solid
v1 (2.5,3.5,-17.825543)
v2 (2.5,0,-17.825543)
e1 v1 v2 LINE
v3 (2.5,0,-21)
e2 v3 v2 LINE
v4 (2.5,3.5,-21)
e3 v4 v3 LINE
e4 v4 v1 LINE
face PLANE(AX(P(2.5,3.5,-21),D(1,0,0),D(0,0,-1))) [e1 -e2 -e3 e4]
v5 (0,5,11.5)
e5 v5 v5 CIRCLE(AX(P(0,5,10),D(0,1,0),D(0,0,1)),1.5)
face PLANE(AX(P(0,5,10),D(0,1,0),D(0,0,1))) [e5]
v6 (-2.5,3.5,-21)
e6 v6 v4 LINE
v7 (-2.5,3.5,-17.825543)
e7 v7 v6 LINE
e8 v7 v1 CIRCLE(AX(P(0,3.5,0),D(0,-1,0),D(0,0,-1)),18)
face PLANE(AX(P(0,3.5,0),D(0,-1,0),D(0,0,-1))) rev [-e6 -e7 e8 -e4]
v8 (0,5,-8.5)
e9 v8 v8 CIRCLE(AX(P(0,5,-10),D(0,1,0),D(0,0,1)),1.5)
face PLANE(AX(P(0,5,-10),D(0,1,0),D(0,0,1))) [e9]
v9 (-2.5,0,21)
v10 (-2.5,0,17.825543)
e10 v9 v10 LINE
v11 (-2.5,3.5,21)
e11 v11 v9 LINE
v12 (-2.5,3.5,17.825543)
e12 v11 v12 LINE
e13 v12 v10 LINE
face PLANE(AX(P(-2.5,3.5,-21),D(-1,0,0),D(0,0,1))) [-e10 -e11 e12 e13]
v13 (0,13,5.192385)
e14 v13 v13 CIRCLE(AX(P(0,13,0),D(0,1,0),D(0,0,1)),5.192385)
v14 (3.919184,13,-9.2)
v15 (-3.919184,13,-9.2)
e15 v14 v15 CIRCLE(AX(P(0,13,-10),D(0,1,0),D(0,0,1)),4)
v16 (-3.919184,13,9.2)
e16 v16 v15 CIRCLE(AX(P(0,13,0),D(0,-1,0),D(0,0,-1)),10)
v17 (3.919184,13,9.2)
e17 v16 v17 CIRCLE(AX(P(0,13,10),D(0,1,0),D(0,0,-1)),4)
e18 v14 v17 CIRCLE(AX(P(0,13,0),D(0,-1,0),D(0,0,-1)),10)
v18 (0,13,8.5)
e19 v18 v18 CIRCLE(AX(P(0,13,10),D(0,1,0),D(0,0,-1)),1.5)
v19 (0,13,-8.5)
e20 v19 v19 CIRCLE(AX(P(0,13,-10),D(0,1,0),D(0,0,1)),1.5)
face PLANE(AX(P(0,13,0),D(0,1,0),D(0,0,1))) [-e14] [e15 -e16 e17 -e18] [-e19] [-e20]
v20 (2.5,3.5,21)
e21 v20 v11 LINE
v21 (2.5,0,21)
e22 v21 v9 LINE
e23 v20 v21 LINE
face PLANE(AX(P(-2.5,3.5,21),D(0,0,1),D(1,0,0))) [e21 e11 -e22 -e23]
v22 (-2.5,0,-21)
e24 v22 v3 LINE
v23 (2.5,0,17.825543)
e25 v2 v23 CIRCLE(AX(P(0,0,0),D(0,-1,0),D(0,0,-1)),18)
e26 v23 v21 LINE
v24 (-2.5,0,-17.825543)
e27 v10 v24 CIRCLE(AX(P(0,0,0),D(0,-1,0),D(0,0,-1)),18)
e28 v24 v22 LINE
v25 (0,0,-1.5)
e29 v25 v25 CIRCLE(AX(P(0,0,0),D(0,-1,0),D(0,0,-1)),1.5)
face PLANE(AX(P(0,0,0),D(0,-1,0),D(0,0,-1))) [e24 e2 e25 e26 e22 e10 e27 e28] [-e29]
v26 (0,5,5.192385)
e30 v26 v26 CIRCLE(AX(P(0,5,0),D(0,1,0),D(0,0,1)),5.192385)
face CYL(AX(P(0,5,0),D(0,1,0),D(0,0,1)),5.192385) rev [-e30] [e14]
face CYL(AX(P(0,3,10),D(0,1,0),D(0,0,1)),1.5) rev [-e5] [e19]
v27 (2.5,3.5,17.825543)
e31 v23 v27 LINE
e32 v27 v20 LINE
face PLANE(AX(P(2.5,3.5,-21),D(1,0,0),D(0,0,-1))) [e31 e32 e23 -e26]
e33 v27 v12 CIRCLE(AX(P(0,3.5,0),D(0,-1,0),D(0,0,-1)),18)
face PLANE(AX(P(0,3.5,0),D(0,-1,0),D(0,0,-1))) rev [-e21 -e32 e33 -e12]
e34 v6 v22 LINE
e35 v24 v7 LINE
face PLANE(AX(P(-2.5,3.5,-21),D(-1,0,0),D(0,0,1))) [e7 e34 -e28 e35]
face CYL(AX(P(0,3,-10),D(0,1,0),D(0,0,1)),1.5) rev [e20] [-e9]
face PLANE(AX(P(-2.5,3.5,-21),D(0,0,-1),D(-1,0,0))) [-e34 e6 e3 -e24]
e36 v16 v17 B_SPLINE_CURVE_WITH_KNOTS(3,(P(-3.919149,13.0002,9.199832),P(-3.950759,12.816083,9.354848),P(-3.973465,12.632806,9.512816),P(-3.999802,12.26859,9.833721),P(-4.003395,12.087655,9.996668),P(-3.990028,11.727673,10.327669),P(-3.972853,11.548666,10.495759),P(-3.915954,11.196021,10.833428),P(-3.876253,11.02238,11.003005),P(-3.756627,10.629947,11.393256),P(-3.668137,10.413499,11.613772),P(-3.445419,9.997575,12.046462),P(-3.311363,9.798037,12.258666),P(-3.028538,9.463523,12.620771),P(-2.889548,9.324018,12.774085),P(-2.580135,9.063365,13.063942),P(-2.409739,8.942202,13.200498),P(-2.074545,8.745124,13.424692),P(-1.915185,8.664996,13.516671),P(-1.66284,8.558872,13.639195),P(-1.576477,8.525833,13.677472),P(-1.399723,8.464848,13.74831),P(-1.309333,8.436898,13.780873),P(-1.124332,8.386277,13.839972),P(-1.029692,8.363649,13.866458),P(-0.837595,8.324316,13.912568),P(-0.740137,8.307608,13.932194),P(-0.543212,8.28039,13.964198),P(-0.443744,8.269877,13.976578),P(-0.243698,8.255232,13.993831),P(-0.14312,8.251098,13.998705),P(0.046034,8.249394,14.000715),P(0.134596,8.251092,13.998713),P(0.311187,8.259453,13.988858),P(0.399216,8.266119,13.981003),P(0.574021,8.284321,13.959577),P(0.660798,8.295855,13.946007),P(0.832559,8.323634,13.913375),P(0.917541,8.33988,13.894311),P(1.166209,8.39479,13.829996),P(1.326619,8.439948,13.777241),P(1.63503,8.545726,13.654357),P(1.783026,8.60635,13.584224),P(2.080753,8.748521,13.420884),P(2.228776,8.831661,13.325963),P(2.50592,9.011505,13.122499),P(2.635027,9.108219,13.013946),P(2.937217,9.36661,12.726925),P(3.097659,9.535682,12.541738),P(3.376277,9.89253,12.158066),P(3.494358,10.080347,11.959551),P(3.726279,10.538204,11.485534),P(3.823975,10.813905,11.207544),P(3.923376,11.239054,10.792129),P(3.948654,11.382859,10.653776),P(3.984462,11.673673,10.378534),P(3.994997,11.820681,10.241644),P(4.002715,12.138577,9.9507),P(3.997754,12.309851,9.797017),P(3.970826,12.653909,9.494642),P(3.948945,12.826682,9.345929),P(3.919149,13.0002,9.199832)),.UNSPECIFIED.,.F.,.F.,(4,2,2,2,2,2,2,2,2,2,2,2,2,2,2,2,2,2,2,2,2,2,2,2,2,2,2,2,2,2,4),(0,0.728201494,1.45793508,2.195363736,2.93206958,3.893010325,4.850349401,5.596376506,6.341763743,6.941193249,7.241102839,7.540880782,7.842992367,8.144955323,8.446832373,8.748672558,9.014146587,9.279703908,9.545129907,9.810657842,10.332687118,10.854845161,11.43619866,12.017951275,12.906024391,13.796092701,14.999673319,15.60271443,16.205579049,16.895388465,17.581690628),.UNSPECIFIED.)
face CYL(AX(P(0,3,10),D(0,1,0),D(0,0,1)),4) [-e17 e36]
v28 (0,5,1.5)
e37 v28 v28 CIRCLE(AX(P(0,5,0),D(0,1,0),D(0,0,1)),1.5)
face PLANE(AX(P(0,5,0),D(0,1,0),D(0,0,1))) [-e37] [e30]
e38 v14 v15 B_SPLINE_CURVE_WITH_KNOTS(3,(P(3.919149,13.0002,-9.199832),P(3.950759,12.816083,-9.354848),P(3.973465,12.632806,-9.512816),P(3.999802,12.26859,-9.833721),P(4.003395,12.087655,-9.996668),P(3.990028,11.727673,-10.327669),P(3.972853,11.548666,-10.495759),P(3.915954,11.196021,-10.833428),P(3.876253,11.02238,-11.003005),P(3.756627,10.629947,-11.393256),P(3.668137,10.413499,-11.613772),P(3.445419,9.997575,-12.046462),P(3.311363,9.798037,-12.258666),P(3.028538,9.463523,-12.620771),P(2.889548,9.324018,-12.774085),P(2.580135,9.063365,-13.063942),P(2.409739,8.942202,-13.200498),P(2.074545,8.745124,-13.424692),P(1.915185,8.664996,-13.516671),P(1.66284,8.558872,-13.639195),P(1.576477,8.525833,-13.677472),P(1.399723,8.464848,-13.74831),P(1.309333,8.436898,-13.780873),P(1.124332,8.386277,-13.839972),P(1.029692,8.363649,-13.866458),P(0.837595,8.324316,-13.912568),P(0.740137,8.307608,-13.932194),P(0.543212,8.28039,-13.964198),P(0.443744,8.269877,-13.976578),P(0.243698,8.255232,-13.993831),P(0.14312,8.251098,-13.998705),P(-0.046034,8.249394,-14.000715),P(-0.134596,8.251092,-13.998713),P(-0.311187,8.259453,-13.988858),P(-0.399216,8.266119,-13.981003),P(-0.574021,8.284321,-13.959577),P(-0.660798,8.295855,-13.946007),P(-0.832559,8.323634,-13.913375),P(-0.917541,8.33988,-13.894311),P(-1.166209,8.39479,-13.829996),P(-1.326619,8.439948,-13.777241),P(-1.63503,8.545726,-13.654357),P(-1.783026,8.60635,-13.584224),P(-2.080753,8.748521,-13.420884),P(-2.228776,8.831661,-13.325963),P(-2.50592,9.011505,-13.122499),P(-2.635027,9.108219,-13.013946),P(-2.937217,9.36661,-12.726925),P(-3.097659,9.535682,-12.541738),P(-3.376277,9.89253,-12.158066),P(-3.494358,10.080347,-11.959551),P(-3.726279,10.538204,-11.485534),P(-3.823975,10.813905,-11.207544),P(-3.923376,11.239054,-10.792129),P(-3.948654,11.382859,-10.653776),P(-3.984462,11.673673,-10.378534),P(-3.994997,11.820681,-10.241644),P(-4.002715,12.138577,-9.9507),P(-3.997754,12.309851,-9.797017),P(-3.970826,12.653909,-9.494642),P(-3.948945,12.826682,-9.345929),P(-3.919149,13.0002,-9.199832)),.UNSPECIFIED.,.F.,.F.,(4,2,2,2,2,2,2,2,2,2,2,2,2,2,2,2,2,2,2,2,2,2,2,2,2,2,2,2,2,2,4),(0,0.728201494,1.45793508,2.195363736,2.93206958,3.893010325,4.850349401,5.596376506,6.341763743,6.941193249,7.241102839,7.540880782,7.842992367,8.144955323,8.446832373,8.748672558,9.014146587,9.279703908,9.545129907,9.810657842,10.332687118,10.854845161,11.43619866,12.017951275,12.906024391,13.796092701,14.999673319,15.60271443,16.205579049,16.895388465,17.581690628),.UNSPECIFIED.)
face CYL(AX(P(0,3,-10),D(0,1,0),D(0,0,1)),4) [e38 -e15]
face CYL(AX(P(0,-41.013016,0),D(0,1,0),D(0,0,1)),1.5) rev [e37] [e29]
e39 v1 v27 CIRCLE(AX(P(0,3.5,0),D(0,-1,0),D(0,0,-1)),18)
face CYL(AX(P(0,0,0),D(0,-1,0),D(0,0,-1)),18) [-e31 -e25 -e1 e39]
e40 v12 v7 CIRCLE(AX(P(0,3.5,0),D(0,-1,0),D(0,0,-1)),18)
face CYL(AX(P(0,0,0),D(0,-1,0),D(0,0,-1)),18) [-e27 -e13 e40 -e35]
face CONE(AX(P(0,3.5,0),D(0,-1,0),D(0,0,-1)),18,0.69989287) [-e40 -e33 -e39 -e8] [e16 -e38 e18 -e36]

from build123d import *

# Parameters (mm, degrees)
CROQUIS2_R                  = 4
CROQUIS2_R_2                = 1.5
SALIENTE_EXTRUIR1_DEPTH     = 10
CROQUIS3_R                  = 5.192385193
CROQUIS3_R_2                = 1.5
CORTAR_EXTRUIR1_DEPTH       = 8
CROQUIS4_W                  = 5
CROQUIS4_H                  = 42
SALIENTE_EXTRUIR2_DEPTH     = 3.5
SALIENTE_EXTRUIR3_START     = -5
SALIENTE_EXTRUIR3_OUTLINE_R = 1.5
SALIENTE_EXTRUIR3_DEPTH     = 5


# Read off the part's stored shape, not the designer's step: Saliente-Extruir3
with BuildPart() as part:
    # Croquis1 → Revolución1 (revolve)
    with BuildSketch(Plane.XY, mode=Mode.PRIVATE) as revoluci_n1_sk:
        Polygon((0, 0), (18, 0), (18, 3.5), (10, 13), (0, 13), align=None)
    revolve(revoluci_n1_sk.sketch.rotate(Axis((0, 0, 0), (0, 1, 0)), 90), axis=Axis((0, 0, 0), (0, 1, 0)))

    # Croquis2 → Saliente-Extruir1 (add)
    # profile 1 of 2: a face of its own
    with BuildSketch(Plane(origin=(0, 13, 0), x_dir=(1, 0, 0), z_dir=(0, 1, 0))):
        with Locations((0, 10)):
            Circle(CROQUIS2_R)
        with Locations((0, 10)):
            Circle(CROQUIS2_R_2, mode=Mode.SUBTRACT)
    # profile 2 of 2: a face of its own
    with BuildSketch(Plane(origin=(0, 13, 0), x_dir=(1, 0, 0), z_dir=(0, 1, 0))):
        with Locations((0, -10)):
            Circle(CROQUIS2_R)
        with Locations((0, -10)):
            Circle(CROQUIS2_R_2, mode=Mode.SUBTRACT)
    extrude(amount=-SALIENTE_EXTRUIR1_DEPTH)

    # Croquis3 → Cortar-Extruir1 (cut)
    with BuildSketch(Plane(origin=(0, 13, 0), x_dir=(1, 0, 0), z_dir=(0, 1, 0))):
        with Locations(Location((0, 0, 0), (0, 0, 270))):
            Circle(CROQUIS3_R)
        with Locations(Location((0, 10, 0), (0, 0, 270))):
            Circle(CROQUIS3_R_2)
        with Locations(Location((0, -10, 0), (0, 0, 270))):
            Circle(CROQUIS3_R_2)
    extrude(amount=-CORTAR_EXTRUIR1_DEPTH, mode=Mode.SUBTRACT)

    # Croquis4 → Saliente-Extruir2 (add)
    with BuildSketch(Plane.XZ):
        Rectangle(CROQUIS4_W, CROQUIS4_H)
    extrude(amount=-SALIENTE_EXTRUIR2_DEPTH)

    # Saliente-Extruir3 outline → Saliente-Extruir3 (cut)
    with BuildSketch(Plane(origin=(0, 5, 0), x_dir=(1, 0, 0), z_dir=(0, 1, 0)).offset(SALIENTE_EXTRUIR3_START)):
        Circle(SALIENTE_EXTRUIR3_OUTLINE_R)
    extrude(amount=SALIENTE_EXTRUIR3_DEPTH, mode=Mode.SUBTRACT)


solid = part.part
